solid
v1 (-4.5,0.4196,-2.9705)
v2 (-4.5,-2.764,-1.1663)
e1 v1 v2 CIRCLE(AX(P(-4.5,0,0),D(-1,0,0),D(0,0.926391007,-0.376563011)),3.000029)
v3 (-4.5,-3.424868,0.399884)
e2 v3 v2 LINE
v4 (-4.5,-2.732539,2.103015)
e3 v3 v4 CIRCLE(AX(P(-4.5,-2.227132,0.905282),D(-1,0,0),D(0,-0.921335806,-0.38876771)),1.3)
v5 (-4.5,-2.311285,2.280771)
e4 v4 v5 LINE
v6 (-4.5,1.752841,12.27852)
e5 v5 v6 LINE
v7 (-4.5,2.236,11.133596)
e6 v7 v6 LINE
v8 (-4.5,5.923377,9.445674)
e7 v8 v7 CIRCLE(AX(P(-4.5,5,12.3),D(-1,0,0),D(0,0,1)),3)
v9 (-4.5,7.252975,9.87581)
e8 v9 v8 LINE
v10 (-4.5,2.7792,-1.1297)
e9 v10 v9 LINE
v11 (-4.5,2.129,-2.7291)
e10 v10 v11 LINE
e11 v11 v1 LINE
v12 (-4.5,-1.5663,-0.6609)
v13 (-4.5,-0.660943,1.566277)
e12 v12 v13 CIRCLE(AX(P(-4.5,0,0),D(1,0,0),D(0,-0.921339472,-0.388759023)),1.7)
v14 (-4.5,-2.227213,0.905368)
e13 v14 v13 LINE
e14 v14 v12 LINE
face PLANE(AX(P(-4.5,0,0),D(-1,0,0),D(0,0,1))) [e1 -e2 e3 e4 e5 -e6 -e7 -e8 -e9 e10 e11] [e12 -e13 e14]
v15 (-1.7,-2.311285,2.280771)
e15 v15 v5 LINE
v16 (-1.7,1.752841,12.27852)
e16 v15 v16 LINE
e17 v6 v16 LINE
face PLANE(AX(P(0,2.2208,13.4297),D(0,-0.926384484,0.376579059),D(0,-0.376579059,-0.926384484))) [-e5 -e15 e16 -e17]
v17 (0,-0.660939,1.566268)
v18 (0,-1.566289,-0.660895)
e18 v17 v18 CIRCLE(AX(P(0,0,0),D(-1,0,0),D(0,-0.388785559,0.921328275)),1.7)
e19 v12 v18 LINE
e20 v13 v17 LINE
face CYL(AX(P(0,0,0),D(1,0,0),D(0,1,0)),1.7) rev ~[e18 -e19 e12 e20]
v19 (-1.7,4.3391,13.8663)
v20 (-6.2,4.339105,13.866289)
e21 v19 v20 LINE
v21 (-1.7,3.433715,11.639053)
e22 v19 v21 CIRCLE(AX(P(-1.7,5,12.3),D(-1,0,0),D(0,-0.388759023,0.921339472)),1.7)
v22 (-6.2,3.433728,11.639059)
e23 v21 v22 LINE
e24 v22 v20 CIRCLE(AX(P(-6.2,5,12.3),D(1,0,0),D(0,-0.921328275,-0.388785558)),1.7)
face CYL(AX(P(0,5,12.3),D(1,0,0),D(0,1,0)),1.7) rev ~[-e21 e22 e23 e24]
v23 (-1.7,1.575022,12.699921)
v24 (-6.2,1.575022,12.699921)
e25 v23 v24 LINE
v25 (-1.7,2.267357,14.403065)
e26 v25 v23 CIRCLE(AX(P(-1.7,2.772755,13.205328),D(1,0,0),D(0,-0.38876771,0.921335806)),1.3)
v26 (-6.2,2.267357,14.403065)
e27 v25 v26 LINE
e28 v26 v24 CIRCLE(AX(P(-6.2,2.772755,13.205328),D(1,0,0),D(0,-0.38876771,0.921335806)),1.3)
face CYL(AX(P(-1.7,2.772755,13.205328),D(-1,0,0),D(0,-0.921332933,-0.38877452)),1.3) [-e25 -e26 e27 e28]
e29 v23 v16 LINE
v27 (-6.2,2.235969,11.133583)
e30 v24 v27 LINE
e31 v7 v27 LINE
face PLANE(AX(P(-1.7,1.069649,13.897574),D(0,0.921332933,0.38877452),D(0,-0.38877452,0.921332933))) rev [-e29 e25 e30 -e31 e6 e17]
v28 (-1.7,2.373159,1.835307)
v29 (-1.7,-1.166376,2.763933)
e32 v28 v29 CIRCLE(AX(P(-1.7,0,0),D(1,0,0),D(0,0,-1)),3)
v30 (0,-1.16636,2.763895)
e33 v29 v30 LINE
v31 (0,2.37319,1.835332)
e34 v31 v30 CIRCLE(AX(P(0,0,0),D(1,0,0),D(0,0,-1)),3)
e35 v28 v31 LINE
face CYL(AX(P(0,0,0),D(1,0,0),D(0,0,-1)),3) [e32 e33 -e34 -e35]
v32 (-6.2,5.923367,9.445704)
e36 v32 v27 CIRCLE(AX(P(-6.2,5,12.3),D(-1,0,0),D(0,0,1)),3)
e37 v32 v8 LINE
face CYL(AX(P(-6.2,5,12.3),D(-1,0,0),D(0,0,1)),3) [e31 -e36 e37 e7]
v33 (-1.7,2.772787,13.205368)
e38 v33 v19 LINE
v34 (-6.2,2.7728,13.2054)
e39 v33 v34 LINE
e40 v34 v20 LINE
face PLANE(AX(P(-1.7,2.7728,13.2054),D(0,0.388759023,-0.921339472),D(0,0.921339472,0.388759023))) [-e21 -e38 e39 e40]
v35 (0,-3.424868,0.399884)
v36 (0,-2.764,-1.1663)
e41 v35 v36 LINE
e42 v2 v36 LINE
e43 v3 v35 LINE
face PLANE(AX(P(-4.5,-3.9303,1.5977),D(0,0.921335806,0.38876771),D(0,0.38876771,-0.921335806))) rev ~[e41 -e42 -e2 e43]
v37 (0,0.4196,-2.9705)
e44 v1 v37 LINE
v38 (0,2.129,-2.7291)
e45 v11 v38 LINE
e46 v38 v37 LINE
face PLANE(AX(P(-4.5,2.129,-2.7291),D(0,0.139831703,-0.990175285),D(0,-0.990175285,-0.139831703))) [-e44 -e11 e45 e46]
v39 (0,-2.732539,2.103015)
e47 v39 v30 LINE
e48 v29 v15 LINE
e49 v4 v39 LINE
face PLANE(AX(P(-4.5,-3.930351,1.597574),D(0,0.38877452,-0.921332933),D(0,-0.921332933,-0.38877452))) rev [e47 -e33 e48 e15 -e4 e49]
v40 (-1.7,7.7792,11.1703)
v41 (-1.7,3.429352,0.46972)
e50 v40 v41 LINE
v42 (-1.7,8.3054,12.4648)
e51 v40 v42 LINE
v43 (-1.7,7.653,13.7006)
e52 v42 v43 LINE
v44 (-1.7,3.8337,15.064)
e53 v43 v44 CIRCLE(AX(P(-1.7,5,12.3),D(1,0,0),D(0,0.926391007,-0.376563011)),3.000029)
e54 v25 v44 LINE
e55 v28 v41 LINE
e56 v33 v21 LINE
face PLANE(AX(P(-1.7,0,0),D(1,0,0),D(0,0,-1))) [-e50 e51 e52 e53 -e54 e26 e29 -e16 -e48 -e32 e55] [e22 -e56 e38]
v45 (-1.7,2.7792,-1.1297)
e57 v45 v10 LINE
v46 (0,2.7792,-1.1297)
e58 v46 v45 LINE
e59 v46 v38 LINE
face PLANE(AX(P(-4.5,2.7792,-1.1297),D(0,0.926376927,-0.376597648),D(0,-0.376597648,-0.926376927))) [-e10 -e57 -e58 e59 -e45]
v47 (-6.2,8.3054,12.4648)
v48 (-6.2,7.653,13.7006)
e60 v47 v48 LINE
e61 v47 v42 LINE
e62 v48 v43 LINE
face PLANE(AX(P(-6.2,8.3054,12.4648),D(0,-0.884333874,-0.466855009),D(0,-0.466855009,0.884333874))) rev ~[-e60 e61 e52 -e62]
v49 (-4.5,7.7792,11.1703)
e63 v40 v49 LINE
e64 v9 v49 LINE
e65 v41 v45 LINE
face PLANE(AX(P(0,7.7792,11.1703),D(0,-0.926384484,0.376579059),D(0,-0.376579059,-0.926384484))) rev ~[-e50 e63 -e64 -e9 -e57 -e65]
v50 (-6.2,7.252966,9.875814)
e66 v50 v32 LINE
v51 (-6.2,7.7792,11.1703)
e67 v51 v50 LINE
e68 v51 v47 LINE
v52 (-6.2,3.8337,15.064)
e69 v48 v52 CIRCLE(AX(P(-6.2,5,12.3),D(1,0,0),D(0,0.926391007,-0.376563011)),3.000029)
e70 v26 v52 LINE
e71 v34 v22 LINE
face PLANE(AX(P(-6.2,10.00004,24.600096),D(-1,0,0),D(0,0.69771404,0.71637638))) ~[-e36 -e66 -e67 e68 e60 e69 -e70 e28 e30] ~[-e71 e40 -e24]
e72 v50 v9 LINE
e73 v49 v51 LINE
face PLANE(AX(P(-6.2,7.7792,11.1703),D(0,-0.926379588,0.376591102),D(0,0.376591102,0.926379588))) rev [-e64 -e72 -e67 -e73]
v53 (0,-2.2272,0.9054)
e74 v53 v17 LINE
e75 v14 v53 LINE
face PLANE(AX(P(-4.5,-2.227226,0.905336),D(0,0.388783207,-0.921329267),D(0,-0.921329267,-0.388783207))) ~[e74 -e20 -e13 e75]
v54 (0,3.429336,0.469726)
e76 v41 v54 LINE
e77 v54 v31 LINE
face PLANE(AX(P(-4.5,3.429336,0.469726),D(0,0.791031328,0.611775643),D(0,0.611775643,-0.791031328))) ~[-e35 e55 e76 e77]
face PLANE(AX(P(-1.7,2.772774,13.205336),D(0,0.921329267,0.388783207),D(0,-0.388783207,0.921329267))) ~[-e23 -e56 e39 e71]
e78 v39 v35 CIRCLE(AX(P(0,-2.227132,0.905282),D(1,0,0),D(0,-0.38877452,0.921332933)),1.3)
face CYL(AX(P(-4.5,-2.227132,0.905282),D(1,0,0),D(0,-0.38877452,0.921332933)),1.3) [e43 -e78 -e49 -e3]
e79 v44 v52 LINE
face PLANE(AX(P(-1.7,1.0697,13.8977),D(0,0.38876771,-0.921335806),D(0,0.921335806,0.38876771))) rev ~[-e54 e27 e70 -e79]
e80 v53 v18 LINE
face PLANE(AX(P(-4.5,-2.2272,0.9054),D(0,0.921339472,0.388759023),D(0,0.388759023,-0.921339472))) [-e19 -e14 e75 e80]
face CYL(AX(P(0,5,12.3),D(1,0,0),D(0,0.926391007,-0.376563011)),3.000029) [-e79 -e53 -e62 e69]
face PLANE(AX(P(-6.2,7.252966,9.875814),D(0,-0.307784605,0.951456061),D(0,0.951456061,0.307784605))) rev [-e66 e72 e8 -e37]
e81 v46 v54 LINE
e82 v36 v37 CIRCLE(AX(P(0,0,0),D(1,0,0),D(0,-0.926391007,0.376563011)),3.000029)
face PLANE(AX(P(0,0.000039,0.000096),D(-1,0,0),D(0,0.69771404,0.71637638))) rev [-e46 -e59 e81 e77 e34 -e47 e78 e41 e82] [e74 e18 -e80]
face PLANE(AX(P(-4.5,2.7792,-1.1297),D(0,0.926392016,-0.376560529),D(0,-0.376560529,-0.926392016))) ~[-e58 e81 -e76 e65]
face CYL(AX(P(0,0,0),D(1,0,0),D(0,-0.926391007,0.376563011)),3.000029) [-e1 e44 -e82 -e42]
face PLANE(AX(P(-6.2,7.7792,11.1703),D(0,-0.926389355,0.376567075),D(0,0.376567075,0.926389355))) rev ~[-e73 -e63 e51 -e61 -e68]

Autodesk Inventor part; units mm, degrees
ref_plane "YZ Plane" through (0, 0, 0) normal (1, 0, 0) x (0, 1, 0)
ref_plane "XY Plane" through (0, 0, 0) normal (0, 0, 1) x (1, 0, 0)
sketch "スケッチ1" plane through (0, 0, 0) normal (1, 0, 0) x (0, 1, 0)
  arc A0 (-2.7792, 1.1297) -> (2.7792, -1.1297) centre (0, 0) ccw
  circle A1 centre (5, 12.3) radius 1.7
  arc A2 (7.7792, 11.1703) -> (2.2208, 13.4297) centre (5, 12.3) ccw
  circle A3 centre (0, 0) radius 1.7
  line L0 (2.2208, 13.4297) -> (-2.7792, 1.1297)
  line L1 (7.7792, 11.1703) -> (2.7792, -1.1297)
  dimension "d1" = 3.4
  dimension "d2" = 6
  dimension "d3" = 3.4
  dimension "d4" = 5
  dimension "d5" = 12.3
  dimension "d8" = 3
extrude "押し出し1" add sketch "スケッチ1" against normal blind 6.2
sketch "スケッチ2" plane through (0, 0, 0) normal (1, 0, 0) x (0, 0, -1)
  circle A0 centre (0, 0) radius 1.7 projected
  circle A1 centre (-12.3, 5) radius 1.7 projected
  line L0 (-1.1297, -2.7792) -> (-13.4297, 2.2208) projected
  arc A2 (-1.1297, -2.7792) -> (1.1297, 2.7792) centre (0, 0) ccw projected
  line L1 (-11.1703, 7.7792) -> (1.1297, 2.7792) projected
  arc A3 (-11.1703, 7.7792) -> (-13.4297, 2.2208) centre (-12.3, 5) ccw projected
  circle A4 centre (0, 0) radius 3
  line L2 (-1.1297, -2.7792) -> (1.1297, 2.7792)
  dimension "d11" = 6
extrude "押し出し2" cut sketch "スケッチ2" against normal blind 1.7 contours A4 L0 A3 L1
sketch "スケッチ3" plane through (-6.2, 0, 0) normal (-1, 0, 0) x (0, 0, 1)
  circle A0 centre (0, 0) radius 1.7 projected
  circle A1 centre (12.3, 5) radius 1.7 projected
  line L0 (1.1297, -2.7792) -> (13.4297, 2.2208) projected
  arc A2 (13.4297, 2.2208) -> (11.1703, 7.7792) centre (12.3, 5) ccw projected
  line L1 (11.1703, 7.7792) -> (-1.1297, 2.7792) projected
  arc A3 (-1.1297, 2.7792) -> (1.1297, -2.7792) centre (0, 0) ccw projected
  circle A4 centre (12.3, 5) radius 3
  line L2 (11.1703, 7.7792) -> (13.4297, 2.2208)
  line L3 (1.1297, -2.7792) -> (13.4297, 2.2208) projected
  dimension "d14" = 6
extrude "押し出し3" cut sketch "スケッチ3" against normal blind 1.7 contours A4 L0 A3 L1
sketch "スケッチ4" plane through (-1.7, 0, 0) normal (1, 0, 0) x (0, 0, -1)
  arc A0 (1.1297, 2.7792) -> (-1.1297, -2.7792) centre (0, 0) ccw projected
  line L0 (-11.1703, 7.7792) -> (1.1297, 2.7792) projected
  arc A1 (-11.1703, 7.7792) -> (-13.4297, 2.2208) centre (-12.3, 5) ccw projected
  line L1 (-1.1297, -2.7792) -> (-13.4297, 2.2208) projected
  circle A2 centre (-12.3, 5) radius 1.7 projected
  line L2 (-13.4297, 2.2208) -> (-13.8977, 1.0697)
  line L3 (-13.8977, 1.0697) -> (-15.064, 3.8337)
  arc A3 (-11.1703, 7.7792) -> (-13.4297, 2.2208) centre (-12.3, 5) ccw projected
  dimension "d17" = 45
extrude "押し出し4" add sketch "スケッチ4" against normal up to surface (4.5 mm away) contours L2 L3 A1
mirror "ミラー1" about plane through (-1.7, 2.2208, 13.4297) normal (0, -0.3765791, -0.9263845) of "押し出し4"
sketch "スケッチ5" plane through (-1.7, 0, 0) normal (1, 0, 0) x (0, 0, -1)
  line L0 (-1.1297, -2.7792) -> (-12.2786, 1.7529) projected
  arc A0 (1.1297, 2.7792) -> (-1.1297, -2.7792) centre (0, 0) ccw projected
  line L1 (-11.1703, 7.7792) -> (1.1297, 2.7792) projected
  arc A1 (-11.1703, 7.7792) -> (-15.064, 3.8337) centre (-12.3, 5) ccw projected
  line L2 (-15.064, 3.8337) -> (-13.8977, 1.0697) projected
  line L3 (-12.2786, 1.7529) -> (-13.8977, 1.0697) projected
  circle A2 centre (-12.3, 5) radius 1.7 projected
  line L4 (-12.9402, 3.4251) -> (-13.2054, 2.7728)
  line L5 (-13.2054, 2.7728) -> (-13.8663, 4.3391)
  circle A3 centre (-12.3, 5) radius 1.7 projected
  arc A4 (-13.8663, 4.3391) -> (-12.9402, 3.4251) centre (-12.3, 5) ccw
  dimension "d20" = 45
extrude "押し出し5" cut sketch "スケッチ5" against normal blind 10 contours A2 L4 L5
mirror "ミラー2" about plane through (-1.7, 3.4251, 12.9402) normal (0, 0.3765791, 0.9263845) of "押し出し5"
fillet "フィレット1" radius 1.3 1 edges at (-3.95, 1.0697, 13.8977)
sketch "スケッチ6" plane through (-4.5, 0, 0) normal (-1, 0, 0) x (0, 0, 1)
  circle A0 centre (0, 0) radius 1.7 projected
  line L0 (12.2786, 1.7529) -> (11.1337, 2.236) projected
  arc A1 (11.1703, 7.7792) -> (11.1337, 2.236) centre (12.3, 5) ccw projected
  line L1 (-1.1297, 2.7792) -> (11.1703, 7.7792) projected
  arc A2 (-1.1297, 2.7792) -> (1.1297, -2.7792) centre (0, 0) ccw projected
  line L2 (12.2786, 1.7529) -> (1.1297, -2.7792) projected
  line L3 (1.1297, -2.7792) -> (1.5977, -3.9303)
  line L4 (1.5977, -3.9303) -> (-1.1663, -2.764)
  dimension "d24" = 45
extrude "押し出し6" add sketch "スケッチ6" against normal up to surface (4.5 mm away) contours L3 L4 A2
mirror "ミラー3" about plane through (-4.5, -2.7792, 1.1297) normal (0, 0.3765791, 0.9263845) of "押し出し6"
sketch "スケッチ7" plane through (-4.5, 0, 0) normal (-1, 0, 0) x (0, 0, 1)
  circle A0 centre (0, 0) radius 1.7 projected
  line L0 (0.6402, -1.5749) -> (0.9054, -2.2272)
  line L1 (0.9054, -2.2272) -> (-0.6609, -1.5663)
  line L2 (-1.1297, 2.7792) -> (11.1703, 7.7792) projected
  dimension "d29" = 45
extrude "押し出し7" cut sketch "スケッチ7" against normal blind 10 contours A0 L0 L1
mirror "ミラー4" about plane through (-4.5, -1.5749, 0.6402) normal (0, -0.3765791, -0.9263845) of "押し出し7"
fillet "フィレット2" radius 1.3 1 edges at (-2.25, -3.9303, 1.5977)
sketch "スケッチ8" plane through (-4.5, 0, 0) normal (-1, 0, 0) x (0, 0, 1)
  line L0 (-1.1297, 2.7792) -> (11.1703, 7.7792) projected
  arc A0 (-1.1297, 2.7792) -> (-1.1663, -2.764) centre (0, 0) ccw projected
  line L1 (-1.1297, 2.7792) -> (-2.7291, 2.129)
  line L2 (-2.7291, 2.129) -> (-2.9705, 0.4196)
extrude "押し出し8" add sketch "スケッチ8" against normal up to surface (4.5 mm away)
ref_plane "作業平面1" through (0, 2.7792, -1.1297) normal (0, -0.3765791, -0.9263845) x (-1, 0, 0)
mirror "ミラー5" about plane through (0, 2.7792, -1.1297) normal (0, -0.3765791, -0.9263845) of "押し出し8"
sketch "スケッチ9" plane through (-6.2, 0, 0) normal (-1, 0, 0) x (0, 0, 1)
  arc A0 (12.7, 1.5751) -> (14.4031, 2.2674) centre (13.2054, 2.7728) ccw projected
  line L0 (14.4031, 2.2674) -> (15.064, 3.8337) projected
  arc A1 (15.064, 3.8337) -> (11.1337, 2.236) centre (12.3, 5) ccw projected
  line L1 (12.7, 1.5751) -> (11.1337, 2.236) projected
  line L2 (13.2054, 2.7728) -> (11.6391, 3.4337) projected
  arc A2 (13.8663, 4.3391) -> (11.6391, 3.4337) centre (12.3, 5) ccw projected
  line L3 (13.8663, 4.3391) -> (13.2054, 2.7728) projected
  line L4 (-2.7291, 2.129) -> (11.1703, 7.7792) projected
  line L5 (11.1703, 7.7792) -> (12.4648, 8.3054)
  line L6 (12.4648, 8.3054) -> (13.7006, 7.653)
  point P0 (0, 0)
extrude "押し出し9" add sketch "スケッチ9" against normal up to surface (4.5 mm away) contours L5 L6 A1
ref_plane "作業平面2" through (0, 7.7792, 11.1703) normal (0, -0.3765791, -0.9263845) x (-1, 0, 0)
mirror "ミラー6" about plane through (0, 7.7792, 11.1703) normal (0, -0.3765791, -0.9263845) of "押し出し9"
ref_plane "作業平面3" through (0, 7.7792, 11.1703) normal (0, -0.3765791, -0.9263845) x (-1, 0, 0)
properties part number "HbRing-LittleCouplerLink01" material "ナイロン 6/6"
